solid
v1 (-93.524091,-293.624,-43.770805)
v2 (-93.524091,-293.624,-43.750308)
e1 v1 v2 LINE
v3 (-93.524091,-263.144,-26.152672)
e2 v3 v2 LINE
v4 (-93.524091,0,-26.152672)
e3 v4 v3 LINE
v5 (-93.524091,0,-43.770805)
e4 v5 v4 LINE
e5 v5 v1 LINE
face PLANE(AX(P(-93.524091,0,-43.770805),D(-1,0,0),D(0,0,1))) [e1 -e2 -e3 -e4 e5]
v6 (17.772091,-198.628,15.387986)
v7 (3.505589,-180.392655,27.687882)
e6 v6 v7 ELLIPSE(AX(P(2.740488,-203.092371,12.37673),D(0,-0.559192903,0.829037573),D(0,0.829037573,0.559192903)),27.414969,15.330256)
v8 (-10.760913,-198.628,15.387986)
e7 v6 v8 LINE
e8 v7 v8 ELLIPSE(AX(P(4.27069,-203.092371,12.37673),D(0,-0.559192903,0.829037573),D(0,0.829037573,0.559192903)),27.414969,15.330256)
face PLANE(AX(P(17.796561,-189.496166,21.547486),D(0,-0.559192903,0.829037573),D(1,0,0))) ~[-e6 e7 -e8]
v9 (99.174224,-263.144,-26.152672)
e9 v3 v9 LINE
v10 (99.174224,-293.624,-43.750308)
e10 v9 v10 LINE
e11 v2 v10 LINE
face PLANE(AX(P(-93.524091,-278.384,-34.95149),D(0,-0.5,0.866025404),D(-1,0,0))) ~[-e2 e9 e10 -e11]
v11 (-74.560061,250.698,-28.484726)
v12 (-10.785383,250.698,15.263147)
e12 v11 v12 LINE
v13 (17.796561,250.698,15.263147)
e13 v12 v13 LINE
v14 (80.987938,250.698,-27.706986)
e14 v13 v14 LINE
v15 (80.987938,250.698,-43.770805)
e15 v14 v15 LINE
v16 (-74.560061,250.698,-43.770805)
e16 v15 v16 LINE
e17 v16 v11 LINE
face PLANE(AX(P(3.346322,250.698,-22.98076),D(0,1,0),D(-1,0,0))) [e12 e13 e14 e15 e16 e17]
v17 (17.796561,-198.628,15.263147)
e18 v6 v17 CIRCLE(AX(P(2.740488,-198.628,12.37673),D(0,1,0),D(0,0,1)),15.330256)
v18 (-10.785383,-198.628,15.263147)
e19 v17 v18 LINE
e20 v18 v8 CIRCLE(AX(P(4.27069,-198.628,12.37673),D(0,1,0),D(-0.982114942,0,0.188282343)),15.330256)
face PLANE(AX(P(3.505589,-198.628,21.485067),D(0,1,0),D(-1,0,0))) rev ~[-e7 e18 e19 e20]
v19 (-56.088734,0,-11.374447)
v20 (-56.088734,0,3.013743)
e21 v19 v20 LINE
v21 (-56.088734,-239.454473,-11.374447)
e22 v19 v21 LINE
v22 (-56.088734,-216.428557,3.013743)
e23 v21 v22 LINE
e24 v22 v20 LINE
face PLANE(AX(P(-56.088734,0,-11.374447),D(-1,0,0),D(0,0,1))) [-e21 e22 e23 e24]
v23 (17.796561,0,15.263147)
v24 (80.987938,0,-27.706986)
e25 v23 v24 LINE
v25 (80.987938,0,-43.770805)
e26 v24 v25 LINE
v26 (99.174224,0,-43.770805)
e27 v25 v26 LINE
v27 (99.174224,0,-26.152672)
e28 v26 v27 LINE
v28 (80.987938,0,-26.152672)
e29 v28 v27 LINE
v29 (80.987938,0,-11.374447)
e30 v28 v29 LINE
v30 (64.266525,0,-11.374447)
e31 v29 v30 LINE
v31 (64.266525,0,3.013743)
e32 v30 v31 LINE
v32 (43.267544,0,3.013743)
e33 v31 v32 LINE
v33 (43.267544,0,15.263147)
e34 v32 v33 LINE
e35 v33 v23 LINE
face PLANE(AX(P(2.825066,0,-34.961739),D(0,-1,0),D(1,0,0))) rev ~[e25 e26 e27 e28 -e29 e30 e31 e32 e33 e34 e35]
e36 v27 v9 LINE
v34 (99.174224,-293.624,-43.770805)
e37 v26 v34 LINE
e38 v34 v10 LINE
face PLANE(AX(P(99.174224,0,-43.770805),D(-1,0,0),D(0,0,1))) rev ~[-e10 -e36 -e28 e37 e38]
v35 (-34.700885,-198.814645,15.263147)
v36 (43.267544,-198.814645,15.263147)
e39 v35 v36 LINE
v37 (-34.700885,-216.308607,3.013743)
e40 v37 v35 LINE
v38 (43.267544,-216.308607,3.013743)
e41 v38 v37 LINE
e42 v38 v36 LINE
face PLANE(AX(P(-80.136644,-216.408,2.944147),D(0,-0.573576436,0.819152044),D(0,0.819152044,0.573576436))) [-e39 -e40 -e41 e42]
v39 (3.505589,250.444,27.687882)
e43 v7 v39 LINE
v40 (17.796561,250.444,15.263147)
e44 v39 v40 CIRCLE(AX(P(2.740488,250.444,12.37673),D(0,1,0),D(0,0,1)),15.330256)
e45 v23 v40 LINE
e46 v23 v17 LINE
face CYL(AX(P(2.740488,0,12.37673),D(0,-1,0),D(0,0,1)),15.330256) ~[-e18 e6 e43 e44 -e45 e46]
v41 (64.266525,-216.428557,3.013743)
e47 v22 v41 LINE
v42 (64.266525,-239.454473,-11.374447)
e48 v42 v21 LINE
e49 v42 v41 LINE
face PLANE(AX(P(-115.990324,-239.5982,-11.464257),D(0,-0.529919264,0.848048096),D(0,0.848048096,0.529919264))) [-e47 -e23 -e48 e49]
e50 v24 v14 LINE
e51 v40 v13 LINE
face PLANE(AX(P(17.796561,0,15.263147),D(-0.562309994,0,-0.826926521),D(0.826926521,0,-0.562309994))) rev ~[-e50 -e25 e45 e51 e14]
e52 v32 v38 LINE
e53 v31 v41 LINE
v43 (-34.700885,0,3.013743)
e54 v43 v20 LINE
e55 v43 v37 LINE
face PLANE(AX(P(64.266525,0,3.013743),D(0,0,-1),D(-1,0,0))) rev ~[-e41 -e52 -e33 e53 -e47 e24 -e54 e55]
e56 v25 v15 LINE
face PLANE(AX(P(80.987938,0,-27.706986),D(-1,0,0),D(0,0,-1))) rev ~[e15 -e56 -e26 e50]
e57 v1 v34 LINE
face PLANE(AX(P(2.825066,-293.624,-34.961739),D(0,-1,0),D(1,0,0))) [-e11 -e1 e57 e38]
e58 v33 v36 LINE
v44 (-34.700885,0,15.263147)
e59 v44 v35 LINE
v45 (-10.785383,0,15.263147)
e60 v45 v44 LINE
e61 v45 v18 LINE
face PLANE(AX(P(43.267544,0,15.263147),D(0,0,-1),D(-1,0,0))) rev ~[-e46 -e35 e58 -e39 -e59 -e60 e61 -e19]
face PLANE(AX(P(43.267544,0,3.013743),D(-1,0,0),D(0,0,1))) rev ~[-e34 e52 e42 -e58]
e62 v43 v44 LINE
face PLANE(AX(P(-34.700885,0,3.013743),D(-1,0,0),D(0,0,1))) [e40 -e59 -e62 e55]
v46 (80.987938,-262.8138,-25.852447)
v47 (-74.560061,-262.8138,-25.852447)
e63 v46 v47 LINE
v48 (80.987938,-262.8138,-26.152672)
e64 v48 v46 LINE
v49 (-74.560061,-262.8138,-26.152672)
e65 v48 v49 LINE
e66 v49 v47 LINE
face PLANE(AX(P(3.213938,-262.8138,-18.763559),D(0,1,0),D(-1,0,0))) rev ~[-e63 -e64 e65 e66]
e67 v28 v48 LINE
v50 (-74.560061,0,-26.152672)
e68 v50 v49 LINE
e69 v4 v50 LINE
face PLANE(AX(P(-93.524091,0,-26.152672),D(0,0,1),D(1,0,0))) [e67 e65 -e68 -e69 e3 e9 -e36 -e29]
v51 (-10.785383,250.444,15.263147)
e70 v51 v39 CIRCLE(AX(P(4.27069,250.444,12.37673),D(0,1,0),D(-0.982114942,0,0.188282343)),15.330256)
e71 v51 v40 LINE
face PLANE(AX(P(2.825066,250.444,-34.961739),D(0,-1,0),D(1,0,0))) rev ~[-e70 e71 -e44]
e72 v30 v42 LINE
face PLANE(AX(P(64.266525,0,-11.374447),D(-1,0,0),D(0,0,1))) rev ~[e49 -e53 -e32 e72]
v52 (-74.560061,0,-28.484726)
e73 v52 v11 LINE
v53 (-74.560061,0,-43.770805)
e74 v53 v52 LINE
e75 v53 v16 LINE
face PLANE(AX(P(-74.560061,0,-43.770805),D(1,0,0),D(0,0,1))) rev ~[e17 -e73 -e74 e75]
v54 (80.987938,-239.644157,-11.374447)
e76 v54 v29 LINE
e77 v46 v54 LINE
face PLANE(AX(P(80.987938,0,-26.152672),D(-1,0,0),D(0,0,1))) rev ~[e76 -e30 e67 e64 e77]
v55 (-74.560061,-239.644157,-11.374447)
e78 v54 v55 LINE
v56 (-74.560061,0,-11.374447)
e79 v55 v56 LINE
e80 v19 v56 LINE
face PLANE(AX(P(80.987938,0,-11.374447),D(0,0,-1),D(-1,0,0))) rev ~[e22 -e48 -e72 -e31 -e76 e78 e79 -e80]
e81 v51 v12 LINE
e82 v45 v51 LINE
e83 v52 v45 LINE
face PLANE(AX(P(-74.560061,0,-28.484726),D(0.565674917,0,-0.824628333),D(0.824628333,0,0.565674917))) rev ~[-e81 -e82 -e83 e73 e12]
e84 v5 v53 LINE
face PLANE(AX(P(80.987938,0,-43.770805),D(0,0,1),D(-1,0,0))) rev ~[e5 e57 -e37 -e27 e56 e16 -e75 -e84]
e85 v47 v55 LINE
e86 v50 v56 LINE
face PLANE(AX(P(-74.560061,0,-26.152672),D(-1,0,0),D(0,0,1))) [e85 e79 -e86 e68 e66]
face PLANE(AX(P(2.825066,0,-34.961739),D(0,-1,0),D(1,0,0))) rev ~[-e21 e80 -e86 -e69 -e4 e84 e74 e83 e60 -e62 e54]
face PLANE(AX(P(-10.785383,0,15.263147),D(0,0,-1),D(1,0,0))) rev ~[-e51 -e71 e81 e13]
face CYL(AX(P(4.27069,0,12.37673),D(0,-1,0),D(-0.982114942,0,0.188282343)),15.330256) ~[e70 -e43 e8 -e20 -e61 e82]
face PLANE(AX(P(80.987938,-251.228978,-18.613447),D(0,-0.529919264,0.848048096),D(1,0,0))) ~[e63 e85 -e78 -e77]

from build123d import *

# Parameters (mm, degrees)
F0_W         = 192.698314786
F0_H         = 17.6181327552
F1_DEPTH     = 293.624
F2_SIZE2     = 17.5976362049
F2_SIZE      = 30.48
F3_W         = 155.5479988456
F3_H         = 14.7782256827
F4_DEPTH     = 262.8138
F5_SIZE2     = 23.1696433115
F5_SIZE      = 14.478
F6_W         = 120.3552596271
F6_H         = 14.3881891854
F7_DEPTH     = 239.5982
F8_T4_DEPTH  = 240.1584395307
F9_W         = 77.968429774
F9_H         = 12.2494040988
F10_DEPTH    = 216.408
F11_T4_DEPTH = 168.8399476849
F12_W        = 28.5819442943
F12_H        = 12.4438395724
F13_DEPTH    = 198.628
F14_SIZE2    = 18.2636685711
F14_SIZE     = 12.319
F15_T1_DEPTH = 255.6446994283
F17_DEPTH    = 250.698
F18_DEPTH    = 250.444


# Not quite as in the source:
# - a fillet or chamfer that OpenCascade refuses, or shapes differently, is made with other operations: its cross-section is extruded or revolved along the edge and cut away or added


with BuildPart() as f1:
    # F0 (on Front) → F1 (new body)
    with BuildSketch(Plane.XZ):
        with Locations((2.8250664473, -34.9617386237)):
            Rectangle(F0_W, F0_H)
    extrude(amount=F1_DEPTH)

    # F2
    f2_edges = [f1.edges().sort_by_distance(p)[0] for p in [
        (2.825066, -293.624, -26.152672),
    ]]
    f2_side = f1.faces().sort_by_distance((2.825066, -146.812, -26.152672))[0]
    chamfer(f2_edges, length=F2_SIZE, length2=F2_SIZE2, reference=f2_side)

    # F3 (on face) → F4 (join)
    with BuildSketch(Plane(origin=(0, 0, 0), x_dir=(-1, 0, 0), z_dir=(0, 1, 0))):
        with Locations((-3.2139383256, -18.7635594048)):
            Rectangle(F3_W, F3_H)
    extrude(amount=-F4_DEPTH)

    # F5
    f5_edges = [f1.edges().sort_by_distance(p)[0] for p in [
        (3.213938, -262.8138, -11.374447),
    ]]
    f5_side = f1.faces().sort_by_distance((3.213938, -262.8138, -18.763559))[0]
    chamfer(f5_edges, length=F5_SIZE, length2=F5_SIZE2, reference=f5_side)

    # F6 (on face) → F7 (join)
    with BuildSketch(Plane(origin=(0, 0, 0), x_dir=(-1, 0, 0), z_dir=(0, 1, 0))):
        with Locations((-4.0888953954, -4.1803519707)):
            Rectangle(F6_W, F6_H)
    extrude(amount=-F7_DEPTH)

    # F8: chamfer of 14.478 x 23.1696433115 on 1 edges, made by hand


with BuildPart() as f8_tool2:
    # F8_s3 → F8_t4 (new body)
    with BuildSketch(Plane.YZ.offset(-115.99032437)):
        Polygon((-239.5982, -11.464257378), (-216.4285566885, 3.013742622), (-239.5982, 3.013742622), align=None)
    extrude(amount=F8_T4_DEPTH)

    split(bisect_by=Plane.XY.offset(-11.3744465634), keep=Keep.TOP)


with BuildPart() as f1_1:
    add(f1.part)

    # F8_t1: cut F8_tool2
    add(f8_tool2.part, mode=Mode.SUBTRACT)

    # F9 (on face) → F10 (join)
    with BuildSketch(Plane(origin=(0, 0, 0), x_dir=(-1, 0, 0), z_dir=(0, 1, 0))):
        with Locations((-4.2833294719, 9.1384446714)):
            Rectangle(F9_W, F9_H)
    extrude(amount=-F10_DEPTH)

    # F11: chamfer of 12.319 x 17.5933552951 on 1 edges, made by hand


with BuildPart() as f11_tool2:
    # F11_s3 → F11_t4 (new body)
    with BuildSketch(Plane.YZ.offset(-80.1366443705)):
        Polygon((-216.408, 2.9441467208), (-198.8146447049, 15.2631467208), (-216.408, 15.2631467208), align=None)
    extrude(amount=F11_T4_DEPTH)

    split(bisect_by=Plane.XY.offset(3.013742622), keep=Keep.TOP)


with BuildPart() as f1_2:
    add(f1_1.part)

    # F11_t1: cut F11_tool2
    add(f11_tool2.part, mode=Mode.SUBTRACT)

    # F12 (on face) → F13 (join)
    with BuildSketch(Plane(origin=(0, 0, 0), x_dir=(-1, 0, 0), z_dir=(0, 1, 0))):
        with Locations((-3.5055889748, 21.485066507)):
            Rectangle(F12_W, F12_H)
    extrude(amount=-F13_DEPTH)

    # F14
    f14_edges = [f1_2.edges().sort_by_distance(p)[0] for p in [
        (3.505589, -198.628, 27.706986),
    ]]
    f14_side = f1_2.faces().sort_by_distance((3.505589, -198.628, 21.485067))[0]
    chamfer(f14_edges, length=F14_SIZE, length2=F14_SIZE2, reference=f14_side)

    # F15: fillet of radius 15.3302561211 on 2 edges, made by hand

    # F15_s2 → F15_t1 (cut)
    with BuildSketch(Plane.XZ.offset(-37.6401839997)):
        with BuildLine():
            ThreePointArc((2.7404875221, 27.7069862932), (12.5069415299, 24.1933764328), (17.7965611219, 15.2631467208))
            Line((17.7965611219, 15.2631467208), (17.7965611219, 27.7069862932))
            Line((17.7965611219, 27.7069862932), (2.7404875221, 27.7069862932))
        make_face()
        with BuildLine():
            ThreePointArc((-10.7853831723, 15.2631467208), (-5.4957635803, 24.1933764328), (4.2706904276, 27.7069862932))
            Line((4.2706904276, 27.7069862932), (-10.7853831723, 27.7069862932))
            Line((-10.7853831723, 27.7069862932), (-10.7853831723, 15.2631467208))
        make_face()
    extrude(amount=F15_T1_DEPTH, mode=Mode.SUBTRACT)

    # F16 (on face) → F17 (join)
    with BuildSketch(Plane(origin=(0, 0, 0), x_dir=(-1, 0, 0), z_dir=(0, 1, 0))):
        Polygon((-80.9879377484, -27.7069862932), (-80.9879377484, -43.7708050013), (74.5600610971, -43.7708050013), (74.5600610971, -28.4847263247), (10.7853831723, 15.2631467208), (-17.7965611219, 15.2631467208), align=None)
    extrude(amount=F17_DEPTH)

    # F18 (add): a face of the model
    f18_faces = [f1_2.faces().sort_by_distance(p)[0] for p in [
        (3.5055889748, 0, 20.394937783),
    ]]
    extrude(f18_faces, amount=F18_DEPTH)


solid = f1_2.part
